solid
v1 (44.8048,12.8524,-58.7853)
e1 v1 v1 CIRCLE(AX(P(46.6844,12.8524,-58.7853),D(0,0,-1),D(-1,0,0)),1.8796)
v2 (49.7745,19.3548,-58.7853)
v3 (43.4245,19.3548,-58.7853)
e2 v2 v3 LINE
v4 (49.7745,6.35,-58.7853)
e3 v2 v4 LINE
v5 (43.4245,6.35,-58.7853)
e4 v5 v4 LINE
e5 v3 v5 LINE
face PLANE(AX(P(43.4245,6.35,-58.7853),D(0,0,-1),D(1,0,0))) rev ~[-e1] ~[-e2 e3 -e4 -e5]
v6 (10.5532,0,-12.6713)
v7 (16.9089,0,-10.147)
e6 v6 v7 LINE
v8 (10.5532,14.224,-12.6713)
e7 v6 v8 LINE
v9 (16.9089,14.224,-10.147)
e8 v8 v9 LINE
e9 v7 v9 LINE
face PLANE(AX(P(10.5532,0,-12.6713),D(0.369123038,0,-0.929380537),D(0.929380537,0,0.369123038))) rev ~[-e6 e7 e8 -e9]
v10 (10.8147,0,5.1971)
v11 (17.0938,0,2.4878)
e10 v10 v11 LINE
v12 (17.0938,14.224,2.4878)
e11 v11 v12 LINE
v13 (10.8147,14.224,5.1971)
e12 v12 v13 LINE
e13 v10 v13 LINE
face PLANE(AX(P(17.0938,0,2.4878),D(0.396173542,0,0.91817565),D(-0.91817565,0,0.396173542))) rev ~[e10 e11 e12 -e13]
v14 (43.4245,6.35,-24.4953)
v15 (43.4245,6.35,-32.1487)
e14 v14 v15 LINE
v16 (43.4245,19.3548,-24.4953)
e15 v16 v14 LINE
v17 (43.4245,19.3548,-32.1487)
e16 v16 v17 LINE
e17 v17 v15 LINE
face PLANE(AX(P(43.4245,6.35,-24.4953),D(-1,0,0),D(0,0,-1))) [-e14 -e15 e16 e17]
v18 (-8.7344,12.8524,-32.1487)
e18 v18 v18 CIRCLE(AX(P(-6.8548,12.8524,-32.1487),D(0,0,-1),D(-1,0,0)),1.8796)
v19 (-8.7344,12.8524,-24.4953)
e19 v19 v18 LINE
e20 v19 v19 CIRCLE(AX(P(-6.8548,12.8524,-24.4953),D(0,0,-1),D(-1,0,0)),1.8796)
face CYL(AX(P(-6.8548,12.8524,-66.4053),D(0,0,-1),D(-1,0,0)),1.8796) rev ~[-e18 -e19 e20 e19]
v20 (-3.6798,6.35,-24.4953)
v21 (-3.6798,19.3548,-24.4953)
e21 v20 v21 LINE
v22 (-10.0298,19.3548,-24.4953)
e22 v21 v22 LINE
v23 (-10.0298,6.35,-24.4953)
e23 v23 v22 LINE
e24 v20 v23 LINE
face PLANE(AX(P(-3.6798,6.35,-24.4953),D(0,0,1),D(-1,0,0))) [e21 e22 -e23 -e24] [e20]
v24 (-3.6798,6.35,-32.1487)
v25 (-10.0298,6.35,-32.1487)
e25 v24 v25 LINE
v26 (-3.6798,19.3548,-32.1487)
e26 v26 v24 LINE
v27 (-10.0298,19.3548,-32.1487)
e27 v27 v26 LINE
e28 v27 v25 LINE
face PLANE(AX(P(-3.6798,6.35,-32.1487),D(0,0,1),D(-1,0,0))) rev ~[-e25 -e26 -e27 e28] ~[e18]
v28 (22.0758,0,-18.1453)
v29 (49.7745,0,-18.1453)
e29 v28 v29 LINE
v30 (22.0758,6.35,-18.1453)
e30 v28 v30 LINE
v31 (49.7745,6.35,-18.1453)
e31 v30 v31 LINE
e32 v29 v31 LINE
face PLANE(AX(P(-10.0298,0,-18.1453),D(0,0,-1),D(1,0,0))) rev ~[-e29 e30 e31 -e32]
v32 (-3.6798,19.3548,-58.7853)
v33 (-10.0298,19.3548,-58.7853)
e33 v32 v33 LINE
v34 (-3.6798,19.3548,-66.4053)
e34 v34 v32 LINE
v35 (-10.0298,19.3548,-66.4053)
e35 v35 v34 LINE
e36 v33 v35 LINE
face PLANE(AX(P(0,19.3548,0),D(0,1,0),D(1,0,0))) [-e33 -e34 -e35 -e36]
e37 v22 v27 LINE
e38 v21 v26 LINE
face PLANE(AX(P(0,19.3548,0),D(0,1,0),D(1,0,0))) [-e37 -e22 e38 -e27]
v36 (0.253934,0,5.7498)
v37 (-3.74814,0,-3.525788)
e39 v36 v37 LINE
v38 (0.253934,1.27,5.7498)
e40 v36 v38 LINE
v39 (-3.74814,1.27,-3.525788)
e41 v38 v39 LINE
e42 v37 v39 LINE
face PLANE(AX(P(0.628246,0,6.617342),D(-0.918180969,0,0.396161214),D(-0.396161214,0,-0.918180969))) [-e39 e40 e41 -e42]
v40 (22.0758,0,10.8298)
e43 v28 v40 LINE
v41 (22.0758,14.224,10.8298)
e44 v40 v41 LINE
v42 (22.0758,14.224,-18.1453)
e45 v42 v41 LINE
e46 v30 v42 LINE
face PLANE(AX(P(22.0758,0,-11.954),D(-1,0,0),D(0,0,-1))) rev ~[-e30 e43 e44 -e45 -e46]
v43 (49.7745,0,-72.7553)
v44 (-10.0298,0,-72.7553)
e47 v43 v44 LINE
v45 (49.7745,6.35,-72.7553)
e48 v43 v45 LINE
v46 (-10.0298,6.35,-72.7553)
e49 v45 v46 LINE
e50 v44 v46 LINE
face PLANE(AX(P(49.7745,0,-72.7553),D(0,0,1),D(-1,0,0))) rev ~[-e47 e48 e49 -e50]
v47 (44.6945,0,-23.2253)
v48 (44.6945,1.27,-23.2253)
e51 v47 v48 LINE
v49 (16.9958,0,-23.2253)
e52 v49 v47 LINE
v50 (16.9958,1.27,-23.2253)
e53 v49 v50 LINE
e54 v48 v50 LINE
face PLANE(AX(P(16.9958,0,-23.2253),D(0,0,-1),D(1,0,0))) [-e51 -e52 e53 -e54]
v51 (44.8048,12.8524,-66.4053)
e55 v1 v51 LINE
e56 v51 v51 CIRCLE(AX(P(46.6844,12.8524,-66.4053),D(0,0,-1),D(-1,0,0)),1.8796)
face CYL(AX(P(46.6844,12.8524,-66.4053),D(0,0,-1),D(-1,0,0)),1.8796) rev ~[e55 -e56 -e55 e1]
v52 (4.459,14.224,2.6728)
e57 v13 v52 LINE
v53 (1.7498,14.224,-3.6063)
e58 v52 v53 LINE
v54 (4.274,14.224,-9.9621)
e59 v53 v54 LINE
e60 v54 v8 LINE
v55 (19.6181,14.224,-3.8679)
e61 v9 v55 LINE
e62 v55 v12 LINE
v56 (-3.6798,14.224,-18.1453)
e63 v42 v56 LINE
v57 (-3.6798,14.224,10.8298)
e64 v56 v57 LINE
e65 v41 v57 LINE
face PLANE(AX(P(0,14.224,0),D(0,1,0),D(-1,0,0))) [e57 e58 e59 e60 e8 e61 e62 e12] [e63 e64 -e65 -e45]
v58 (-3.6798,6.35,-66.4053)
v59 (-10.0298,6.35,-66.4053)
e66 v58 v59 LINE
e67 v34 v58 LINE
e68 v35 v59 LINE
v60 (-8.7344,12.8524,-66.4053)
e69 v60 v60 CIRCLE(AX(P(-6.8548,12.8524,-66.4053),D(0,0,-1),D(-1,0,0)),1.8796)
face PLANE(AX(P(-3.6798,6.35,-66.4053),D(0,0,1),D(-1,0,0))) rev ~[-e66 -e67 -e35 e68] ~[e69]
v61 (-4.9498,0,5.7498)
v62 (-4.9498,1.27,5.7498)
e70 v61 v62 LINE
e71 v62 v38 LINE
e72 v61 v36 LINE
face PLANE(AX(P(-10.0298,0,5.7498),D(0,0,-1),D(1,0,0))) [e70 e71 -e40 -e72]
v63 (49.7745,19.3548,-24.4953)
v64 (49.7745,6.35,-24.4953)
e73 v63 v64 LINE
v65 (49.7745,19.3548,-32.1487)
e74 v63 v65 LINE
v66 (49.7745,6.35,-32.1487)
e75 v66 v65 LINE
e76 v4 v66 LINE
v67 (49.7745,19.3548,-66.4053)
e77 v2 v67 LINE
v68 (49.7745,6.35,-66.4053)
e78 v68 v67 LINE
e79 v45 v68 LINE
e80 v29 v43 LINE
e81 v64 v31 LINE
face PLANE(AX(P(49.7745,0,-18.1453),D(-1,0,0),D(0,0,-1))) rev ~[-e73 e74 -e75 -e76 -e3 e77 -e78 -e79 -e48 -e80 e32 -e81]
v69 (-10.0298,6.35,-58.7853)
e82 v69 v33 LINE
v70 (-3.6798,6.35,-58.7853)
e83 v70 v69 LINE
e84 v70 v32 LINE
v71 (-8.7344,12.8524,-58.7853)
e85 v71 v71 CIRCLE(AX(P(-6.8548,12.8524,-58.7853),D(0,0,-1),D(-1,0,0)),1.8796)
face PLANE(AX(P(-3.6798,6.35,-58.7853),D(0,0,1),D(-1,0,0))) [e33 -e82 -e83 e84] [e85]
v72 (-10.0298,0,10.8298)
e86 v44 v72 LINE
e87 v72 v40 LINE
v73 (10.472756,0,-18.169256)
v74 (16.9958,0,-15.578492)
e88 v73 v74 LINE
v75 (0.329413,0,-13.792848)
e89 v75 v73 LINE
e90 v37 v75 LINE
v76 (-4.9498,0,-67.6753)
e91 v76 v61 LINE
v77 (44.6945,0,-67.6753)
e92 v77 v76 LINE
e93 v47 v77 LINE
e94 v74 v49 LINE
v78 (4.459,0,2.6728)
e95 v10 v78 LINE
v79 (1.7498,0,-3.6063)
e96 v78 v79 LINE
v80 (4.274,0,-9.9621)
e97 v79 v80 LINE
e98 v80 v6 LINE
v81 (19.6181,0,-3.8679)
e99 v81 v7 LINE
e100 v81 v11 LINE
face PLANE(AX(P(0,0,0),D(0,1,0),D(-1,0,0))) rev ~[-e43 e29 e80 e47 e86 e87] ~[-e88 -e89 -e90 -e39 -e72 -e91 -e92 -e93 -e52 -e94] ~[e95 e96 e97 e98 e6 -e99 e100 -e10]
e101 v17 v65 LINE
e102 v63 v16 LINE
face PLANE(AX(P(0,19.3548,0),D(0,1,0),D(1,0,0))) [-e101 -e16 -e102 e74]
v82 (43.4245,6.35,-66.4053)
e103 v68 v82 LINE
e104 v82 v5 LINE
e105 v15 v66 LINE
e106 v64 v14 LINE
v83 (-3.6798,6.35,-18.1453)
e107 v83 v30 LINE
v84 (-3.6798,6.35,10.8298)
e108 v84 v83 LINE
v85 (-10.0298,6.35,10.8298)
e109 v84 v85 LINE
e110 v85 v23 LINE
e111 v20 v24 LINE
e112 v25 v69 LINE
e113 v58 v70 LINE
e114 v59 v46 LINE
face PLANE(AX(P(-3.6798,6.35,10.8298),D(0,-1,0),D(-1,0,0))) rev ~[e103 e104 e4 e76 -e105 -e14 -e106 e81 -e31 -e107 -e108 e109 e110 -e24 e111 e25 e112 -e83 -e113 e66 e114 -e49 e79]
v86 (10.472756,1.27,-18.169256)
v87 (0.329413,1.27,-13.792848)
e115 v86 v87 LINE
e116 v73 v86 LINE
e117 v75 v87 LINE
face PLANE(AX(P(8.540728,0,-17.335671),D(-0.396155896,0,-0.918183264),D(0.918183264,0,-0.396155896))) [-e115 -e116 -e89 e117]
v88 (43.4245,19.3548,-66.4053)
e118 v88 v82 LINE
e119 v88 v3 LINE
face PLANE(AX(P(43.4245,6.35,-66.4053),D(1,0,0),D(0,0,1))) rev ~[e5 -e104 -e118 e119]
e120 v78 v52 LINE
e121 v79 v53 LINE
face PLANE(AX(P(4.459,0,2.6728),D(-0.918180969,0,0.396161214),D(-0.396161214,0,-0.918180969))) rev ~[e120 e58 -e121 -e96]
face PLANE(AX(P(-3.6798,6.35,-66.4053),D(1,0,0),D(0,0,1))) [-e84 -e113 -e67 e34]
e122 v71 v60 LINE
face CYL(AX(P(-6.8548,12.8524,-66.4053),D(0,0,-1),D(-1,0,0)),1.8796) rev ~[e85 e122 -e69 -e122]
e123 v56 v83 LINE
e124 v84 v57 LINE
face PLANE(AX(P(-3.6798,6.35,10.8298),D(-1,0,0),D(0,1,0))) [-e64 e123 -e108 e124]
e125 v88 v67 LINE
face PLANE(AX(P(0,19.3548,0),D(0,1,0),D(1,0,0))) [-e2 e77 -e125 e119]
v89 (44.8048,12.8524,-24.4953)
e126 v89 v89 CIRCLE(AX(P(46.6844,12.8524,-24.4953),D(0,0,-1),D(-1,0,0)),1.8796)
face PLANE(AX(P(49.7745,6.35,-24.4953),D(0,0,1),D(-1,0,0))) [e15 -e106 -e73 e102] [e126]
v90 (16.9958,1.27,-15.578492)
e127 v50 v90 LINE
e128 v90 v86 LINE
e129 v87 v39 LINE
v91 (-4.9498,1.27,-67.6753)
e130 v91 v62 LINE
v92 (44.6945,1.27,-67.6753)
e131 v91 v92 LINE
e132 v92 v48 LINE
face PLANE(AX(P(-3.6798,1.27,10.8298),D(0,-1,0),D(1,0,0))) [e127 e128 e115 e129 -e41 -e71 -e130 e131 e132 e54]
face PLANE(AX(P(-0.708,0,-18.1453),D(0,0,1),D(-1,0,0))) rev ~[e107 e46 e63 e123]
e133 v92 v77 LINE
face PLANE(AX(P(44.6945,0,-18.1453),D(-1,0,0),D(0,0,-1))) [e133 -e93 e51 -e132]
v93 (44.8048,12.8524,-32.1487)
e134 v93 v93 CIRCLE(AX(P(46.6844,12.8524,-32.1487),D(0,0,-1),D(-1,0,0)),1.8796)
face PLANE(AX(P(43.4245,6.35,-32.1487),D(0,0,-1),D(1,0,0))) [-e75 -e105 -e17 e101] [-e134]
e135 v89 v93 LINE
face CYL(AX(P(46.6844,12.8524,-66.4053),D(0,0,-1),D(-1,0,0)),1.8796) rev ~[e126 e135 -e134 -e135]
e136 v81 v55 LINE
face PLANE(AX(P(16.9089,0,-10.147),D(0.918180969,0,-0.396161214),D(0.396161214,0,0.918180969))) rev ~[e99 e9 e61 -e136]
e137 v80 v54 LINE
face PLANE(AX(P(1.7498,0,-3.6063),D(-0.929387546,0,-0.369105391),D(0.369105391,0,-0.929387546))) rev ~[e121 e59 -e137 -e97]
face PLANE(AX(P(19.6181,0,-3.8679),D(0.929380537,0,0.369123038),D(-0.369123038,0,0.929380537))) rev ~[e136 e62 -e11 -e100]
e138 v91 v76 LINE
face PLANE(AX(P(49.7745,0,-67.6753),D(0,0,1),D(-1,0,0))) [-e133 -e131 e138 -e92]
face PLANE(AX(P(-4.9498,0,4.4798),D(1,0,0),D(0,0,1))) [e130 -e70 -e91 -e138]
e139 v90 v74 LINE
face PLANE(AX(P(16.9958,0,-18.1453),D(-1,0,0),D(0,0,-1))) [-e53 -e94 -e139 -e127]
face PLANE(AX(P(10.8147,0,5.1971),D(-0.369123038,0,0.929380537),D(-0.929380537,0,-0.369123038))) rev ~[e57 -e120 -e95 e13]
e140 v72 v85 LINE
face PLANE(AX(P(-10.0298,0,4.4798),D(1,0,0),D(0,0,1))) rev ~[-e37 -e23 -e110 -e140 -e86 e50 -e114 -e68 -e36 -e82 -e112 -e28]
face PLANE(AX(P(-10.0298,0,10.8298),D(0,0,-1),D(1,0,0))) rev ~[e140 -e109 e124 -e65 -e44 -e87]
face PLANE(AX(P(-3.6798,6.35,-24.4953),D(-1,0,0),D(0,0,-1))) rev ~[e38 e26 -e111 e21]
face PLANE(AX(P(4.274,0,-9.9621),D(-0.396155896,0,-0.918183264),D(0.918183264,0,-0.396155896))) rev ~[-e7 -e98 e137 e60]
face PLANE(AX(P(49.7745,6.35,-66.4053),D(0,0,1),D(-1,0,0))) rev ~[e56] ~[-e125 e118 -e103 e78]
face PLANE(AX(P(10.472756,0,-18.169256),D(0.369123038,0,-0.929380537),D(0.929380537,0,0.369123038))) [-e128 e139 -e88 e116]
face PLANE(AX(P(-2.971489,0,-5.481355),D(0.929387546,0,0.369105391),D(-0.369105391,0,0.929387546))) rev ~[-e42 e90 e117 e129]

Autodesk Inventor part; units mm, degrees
ref_plane "YZ Plane" through (0, 0, 0) normal (1, 0, 0) x (0, 1, 0)
ref_plane "XZ Plane" through (0, 0, 0) normal (0, 1, 0) x (-1, 0, 0)
ref_plane "XY Plane" through (0, 0, 0) normal (0, 0, 1) x (1, 0, 0)
sketch "Sketch1" plane through (0, 0, 0) normal (0, 1, 0) x (-1, 0, 0)
  line L0 (10.0298, 10.8298) -> (-22.0758, 10.8298)
  line L1 (-22.0758, 10.8298) -> (-22.0758, -18.1453)
  line L2 (-22.0758, -18.1453) -> (10.0298, -18.1453)
  line L3 (10.0298, -18.1453) -> (10.0298, 10.8298)
  line L4 (10.0298, 10.8298) -> (0.708, 10.8298)
  line L5 (10.0298, 4.4798) -> (10.0298, 10.8298)
  line L6 (10.0298, -18.1453) -> (0.708, -18.1453)
  line L7 (10.0298, -11.954) -> (10.0298, -18.1453)
  line L8 (-22.0758, 4.4798) -> (-22.0758, -11.954)
  line L9 (-4.274, -9.9621) -> (-10.5532, -12.6713)
  line L10 (-10.5532, -12.6713) -> (-16.9089, -10.147)
  line L11 (-16.9089, -10.147) -> (-19.6181, -3.8679)
  line L12 (-19.6181, -3.8679) -> (-17.0938, 2.4878)
  line L13 (-17.0938, 2.4878) -> (-10.8147, 5.1971)
  line L14 (-10.8147, 5.1971) -> (-4.459, 2.6728)
  line L15 (-4.459, 2.6728) -> (-1.7498, -3.6063)
  line L16 (-1.7498, -3.6063) -> (-4.274, -9.9621)
  point P0 (0, 0)
  point P1 (-10.6839, -3.7371)
  dimension "d0" = 28.975
  dimension "d1" = 32.1056
extrude "Extrusion1" add sketch "Sketch1" along normal blind 14.224
sketch "Sketch2" plane through (0, 0, 0) normal (0, -1, 0) x (1, 0, 0)
  line L0 (-10.0298, -18.1453) -> (-10.0298, 10.8298) projected
  line L1 (-10.0298, -18.1453) -> (49.7745, -18.1453)
  line L2 (49.7745, -18.1453) -> (49.7745, -24.4953)
  line L3 (49.7745, -24.4953) -> (-10.0298, -24.4953)
  line L4 (-10.0298, -24.4953) -> (-10.0298, -18.1453)
  line L5 (-10.0298, -24.4953) -> (49.7745, -24.4953)
  line L6 (49.7745, -24.4953) -> (49.7745, -72.7553)
  line L7 (49.7745, -72.7553) -> (-10.0298, -72.7553)
  line L8 (-10.0298, -72.7553) -> (-10.0298, -24.4953)
  line L9 (-10.0298, -24.4953) -> (-3.6798, -24.4953)
  line L10 (-3.6798, -24.4953) -> (-3.6798, -32.1153)
  line L11 (-3.6798, -32.1153) -> (-10.0298, -32.1153)
  line L12 (-10.0298, -32.1153) -> (-10.0298, -24.4953)
  line L13 (49.7745, -24.4953) -> (43.4245, -24.4953)
  line L14 (43.4245, -24.4953) -> (43.4245, -32.1153)
  line L15 (43.4245, -32.1153) -> (49.7745, -32.1153)
  line L16 (49.7745, -32.1153) -> (49.7745, -24.4953)
  line L17 (49.7745, -72.7553) -> (-10.0298, -72.7553)
  line L18 (-10.0298, -72.7553) -> (-10.0298, -66.4053)
  line L19 (-10.0298, -66.4053) -> (49.7745, -66.4053)
  line L20 (49.7745, -66.4053) -> (49.7745, -72.7553)
  line L21 (-10.0298, -66.4053) -> (-3.6798, -66.4053)
  line L22 (-3.6798, -66.4053) -> (-3.6798, -58.7853)
  line L23 (-3.6798, -58.7853) -> (-10.0298, -58.7853)
  line L24 (-10.0298, -58.7853) -> (-10.0298, -66.4053)
  line L25 (49.7745, -66.4053) -> (43.4245, -66.4053)
  line L26 (43.4245, -66.4053) -> (43.4245, -58.7853)
  line L27 (43.4245, -58.7853) -> (49.7745, -58.7853)
  line L28 (49.7745, -58.7853) -> (49.7745, -66.4053)
  point P0 (0, 0)
  dimension "d8" = 59.8043
  dimension "d9" = 6.35
  dimension "d10" = 48.26
  dimension "d11" = 6.35
  dimension "d12" = 7.62
  dimension "d13" = 6.35
  dimension "d14" = 6.35
  dimension "d15" = 6.35
  dimension "d16" = 7.62
extrude "Extrusion2" add sketch "Sketch2" against normal blind 6.35
sketch "Sketch3" plane through (0, 6.35, 0) normal (0, 1, 0) x (1, 0, 0)
  line L0 (-10.0298, -10.8298) -> (-10.0298, 72.7553) projected
  line L1 (49.7745, 18.1453) -> (49.7745, 72.7553) projected
  line L2 (-10.0298, 72.7553) -> (49.7745, 72.7553)
  line L3 (49.7745, 72.7553) -> (49.7745, 66.4053)
  line L4 (49.7745, 66.4053) -> (-10.0298, 66.4053)
  line L5 (-10.0298, 66.4053) -> (-10.0298, 72.7553)
  line L6 (-10.0298, 66.4053) -> (-3.6798, 66.4053)
  line L7 (-3.6798, 66.4053) -> (-3.6798, 58.7853)
  line L8 (-3.6798, 58.7853) -> (-10.0298, 58.7853)
  line L9 (-10.0298, 58.7853) -> (-10.0298, 66.4053)
  line L10 (49.7745, 66.4053) -> (43.4245, 66.4053)
  line L11 (43.4245, 66.4053) -> (43.4245, 58.7853)
  line L12 (43.4245, 58.7853) -> (49.7745, 58.7853)
  line L13 (49.7745, 58.7853) -> (49.7745, 66.4053)
  line L14 (22.0758, 18.1453) -> (-10.0298, 18.1453) projected
  line L15 (-10.0298, 18.1453) -> (-3.6798, 18.1453)
  line L16 (49.7745, 18.1453) -> (43.4245, 18.1453)
  line L17 (-10.0298, 18.1453) -> (49.7745, 18.1453)
  line L18 (49.7745, 24.4953) -> (-10.0298, 24.4953)
  line L19 (-10.0298, 24.4953) -> (-10.0298, 18.1453)
  line L20 (-10.0298, 24.4953) -> (-3.6798, 24.4953)
  line L21 (-3.6798, 24.4953) -> (-3.6798, 32.1487)
  line L22 (-3.6798, 32.1487) -> (-10.0298, 32.1487)
  line L23 (-10.0298, 32.1487) -> (-10.0298, 24.4953)
  line L24 (49.7745, 24.4953) -> (43.4245, 24.4953)
  line L25 (43.4245, 24.4953) -> (43.4245, 32.1487)
  line L26 (43.4245, 32.1487) -> (49.7745, 32.1487)
  line L27 (49.7745, 32.1487) -> (49.7745, 24.4953)
  point P0 (0, 0)
  dimension "d19" = 6.35
  dimension "d20" = 6.35
  dimension "d21" = 7.62
  dimension "d22" = 6.35
  dimension "d23" = 7.62
  dimension "d26" = 6.35
extrude "Extrusion3" add sketch "Sketch3" along normal blind 13.0048 contours L0 L22 L21 L18 | L0 L4 L7 L8 | L25 L26 L1 L18 | L4 L1 L12 L11
sketch "Sketch4" plane through (-10.0298, 0, 10.8298) normal (0, 0, 1) x (1, 0, 0)
  line L0 (32.1056, 14.224) -> (0, 14.224) projected
  line L1 (6.35, 6.35) -> (6.35, 19.3548) projected
  line L2 (0, 14.224) -> (6.35, 14.224)
  line L3 (6.35, 14.224) -> (6.35, 6.35)
  line L4 (6.35, 6.35) -> (0, 6.35)
  line L5 (0, 6.35) -> (0, 14.224)
  point P0 (10.0298, 0)
extrude "Extrusion4" cut sketch "Sketch4" along normal mid plane 64.7827
sketch "Sketch5" plane through (-3.6798, 6.35, -66.4053) normal (0, 0, -1) x (-1, 0, 0)
  line L0 (6.35, 13.0048) -> (0, 0)
  line L1 (0, 0) -> (0, 13.0048) projected
  line L2 (0, 0) -> (0, 13.0048)
  line L3 (0, 0) -> (6.35, 0) projected
  line L4 (0, 13.0048) -> (6.35, 0)
  line L5 (-53.4543, 0) -> (-53.4543, 13.0048) projected
  line L6 (-53.4543, 13.0048) -> (-47.2741, 0)
  line L7 (-47.2741, 13.0048) -> (-53.4543, 0)
  circle A0 centre (3.175, 6.5024) radius 1.8796
  circle A1 centre (-50.3642, 6.5024) radius 1.8796
  point P0 (-3.6798, -6.35)
  dimension "d31" = 3.7592
  dimension "d32" = 3.7592
extrude "Extrusion5" cut sketch "Sketch5" along normal mid plane 183.8452 contours A0 L4 L0 | L0 L4 A0 | L4 A0 L0 | L0 A0 L4 | A1 L6 L7 | L7 L6 A1 | A1 L7 L6 | L7 A1 L6
shell "Shell1" thickness 5.08 removed faces 1 at (20.6069, 0, -54.5519)
properties part number "leftside"
